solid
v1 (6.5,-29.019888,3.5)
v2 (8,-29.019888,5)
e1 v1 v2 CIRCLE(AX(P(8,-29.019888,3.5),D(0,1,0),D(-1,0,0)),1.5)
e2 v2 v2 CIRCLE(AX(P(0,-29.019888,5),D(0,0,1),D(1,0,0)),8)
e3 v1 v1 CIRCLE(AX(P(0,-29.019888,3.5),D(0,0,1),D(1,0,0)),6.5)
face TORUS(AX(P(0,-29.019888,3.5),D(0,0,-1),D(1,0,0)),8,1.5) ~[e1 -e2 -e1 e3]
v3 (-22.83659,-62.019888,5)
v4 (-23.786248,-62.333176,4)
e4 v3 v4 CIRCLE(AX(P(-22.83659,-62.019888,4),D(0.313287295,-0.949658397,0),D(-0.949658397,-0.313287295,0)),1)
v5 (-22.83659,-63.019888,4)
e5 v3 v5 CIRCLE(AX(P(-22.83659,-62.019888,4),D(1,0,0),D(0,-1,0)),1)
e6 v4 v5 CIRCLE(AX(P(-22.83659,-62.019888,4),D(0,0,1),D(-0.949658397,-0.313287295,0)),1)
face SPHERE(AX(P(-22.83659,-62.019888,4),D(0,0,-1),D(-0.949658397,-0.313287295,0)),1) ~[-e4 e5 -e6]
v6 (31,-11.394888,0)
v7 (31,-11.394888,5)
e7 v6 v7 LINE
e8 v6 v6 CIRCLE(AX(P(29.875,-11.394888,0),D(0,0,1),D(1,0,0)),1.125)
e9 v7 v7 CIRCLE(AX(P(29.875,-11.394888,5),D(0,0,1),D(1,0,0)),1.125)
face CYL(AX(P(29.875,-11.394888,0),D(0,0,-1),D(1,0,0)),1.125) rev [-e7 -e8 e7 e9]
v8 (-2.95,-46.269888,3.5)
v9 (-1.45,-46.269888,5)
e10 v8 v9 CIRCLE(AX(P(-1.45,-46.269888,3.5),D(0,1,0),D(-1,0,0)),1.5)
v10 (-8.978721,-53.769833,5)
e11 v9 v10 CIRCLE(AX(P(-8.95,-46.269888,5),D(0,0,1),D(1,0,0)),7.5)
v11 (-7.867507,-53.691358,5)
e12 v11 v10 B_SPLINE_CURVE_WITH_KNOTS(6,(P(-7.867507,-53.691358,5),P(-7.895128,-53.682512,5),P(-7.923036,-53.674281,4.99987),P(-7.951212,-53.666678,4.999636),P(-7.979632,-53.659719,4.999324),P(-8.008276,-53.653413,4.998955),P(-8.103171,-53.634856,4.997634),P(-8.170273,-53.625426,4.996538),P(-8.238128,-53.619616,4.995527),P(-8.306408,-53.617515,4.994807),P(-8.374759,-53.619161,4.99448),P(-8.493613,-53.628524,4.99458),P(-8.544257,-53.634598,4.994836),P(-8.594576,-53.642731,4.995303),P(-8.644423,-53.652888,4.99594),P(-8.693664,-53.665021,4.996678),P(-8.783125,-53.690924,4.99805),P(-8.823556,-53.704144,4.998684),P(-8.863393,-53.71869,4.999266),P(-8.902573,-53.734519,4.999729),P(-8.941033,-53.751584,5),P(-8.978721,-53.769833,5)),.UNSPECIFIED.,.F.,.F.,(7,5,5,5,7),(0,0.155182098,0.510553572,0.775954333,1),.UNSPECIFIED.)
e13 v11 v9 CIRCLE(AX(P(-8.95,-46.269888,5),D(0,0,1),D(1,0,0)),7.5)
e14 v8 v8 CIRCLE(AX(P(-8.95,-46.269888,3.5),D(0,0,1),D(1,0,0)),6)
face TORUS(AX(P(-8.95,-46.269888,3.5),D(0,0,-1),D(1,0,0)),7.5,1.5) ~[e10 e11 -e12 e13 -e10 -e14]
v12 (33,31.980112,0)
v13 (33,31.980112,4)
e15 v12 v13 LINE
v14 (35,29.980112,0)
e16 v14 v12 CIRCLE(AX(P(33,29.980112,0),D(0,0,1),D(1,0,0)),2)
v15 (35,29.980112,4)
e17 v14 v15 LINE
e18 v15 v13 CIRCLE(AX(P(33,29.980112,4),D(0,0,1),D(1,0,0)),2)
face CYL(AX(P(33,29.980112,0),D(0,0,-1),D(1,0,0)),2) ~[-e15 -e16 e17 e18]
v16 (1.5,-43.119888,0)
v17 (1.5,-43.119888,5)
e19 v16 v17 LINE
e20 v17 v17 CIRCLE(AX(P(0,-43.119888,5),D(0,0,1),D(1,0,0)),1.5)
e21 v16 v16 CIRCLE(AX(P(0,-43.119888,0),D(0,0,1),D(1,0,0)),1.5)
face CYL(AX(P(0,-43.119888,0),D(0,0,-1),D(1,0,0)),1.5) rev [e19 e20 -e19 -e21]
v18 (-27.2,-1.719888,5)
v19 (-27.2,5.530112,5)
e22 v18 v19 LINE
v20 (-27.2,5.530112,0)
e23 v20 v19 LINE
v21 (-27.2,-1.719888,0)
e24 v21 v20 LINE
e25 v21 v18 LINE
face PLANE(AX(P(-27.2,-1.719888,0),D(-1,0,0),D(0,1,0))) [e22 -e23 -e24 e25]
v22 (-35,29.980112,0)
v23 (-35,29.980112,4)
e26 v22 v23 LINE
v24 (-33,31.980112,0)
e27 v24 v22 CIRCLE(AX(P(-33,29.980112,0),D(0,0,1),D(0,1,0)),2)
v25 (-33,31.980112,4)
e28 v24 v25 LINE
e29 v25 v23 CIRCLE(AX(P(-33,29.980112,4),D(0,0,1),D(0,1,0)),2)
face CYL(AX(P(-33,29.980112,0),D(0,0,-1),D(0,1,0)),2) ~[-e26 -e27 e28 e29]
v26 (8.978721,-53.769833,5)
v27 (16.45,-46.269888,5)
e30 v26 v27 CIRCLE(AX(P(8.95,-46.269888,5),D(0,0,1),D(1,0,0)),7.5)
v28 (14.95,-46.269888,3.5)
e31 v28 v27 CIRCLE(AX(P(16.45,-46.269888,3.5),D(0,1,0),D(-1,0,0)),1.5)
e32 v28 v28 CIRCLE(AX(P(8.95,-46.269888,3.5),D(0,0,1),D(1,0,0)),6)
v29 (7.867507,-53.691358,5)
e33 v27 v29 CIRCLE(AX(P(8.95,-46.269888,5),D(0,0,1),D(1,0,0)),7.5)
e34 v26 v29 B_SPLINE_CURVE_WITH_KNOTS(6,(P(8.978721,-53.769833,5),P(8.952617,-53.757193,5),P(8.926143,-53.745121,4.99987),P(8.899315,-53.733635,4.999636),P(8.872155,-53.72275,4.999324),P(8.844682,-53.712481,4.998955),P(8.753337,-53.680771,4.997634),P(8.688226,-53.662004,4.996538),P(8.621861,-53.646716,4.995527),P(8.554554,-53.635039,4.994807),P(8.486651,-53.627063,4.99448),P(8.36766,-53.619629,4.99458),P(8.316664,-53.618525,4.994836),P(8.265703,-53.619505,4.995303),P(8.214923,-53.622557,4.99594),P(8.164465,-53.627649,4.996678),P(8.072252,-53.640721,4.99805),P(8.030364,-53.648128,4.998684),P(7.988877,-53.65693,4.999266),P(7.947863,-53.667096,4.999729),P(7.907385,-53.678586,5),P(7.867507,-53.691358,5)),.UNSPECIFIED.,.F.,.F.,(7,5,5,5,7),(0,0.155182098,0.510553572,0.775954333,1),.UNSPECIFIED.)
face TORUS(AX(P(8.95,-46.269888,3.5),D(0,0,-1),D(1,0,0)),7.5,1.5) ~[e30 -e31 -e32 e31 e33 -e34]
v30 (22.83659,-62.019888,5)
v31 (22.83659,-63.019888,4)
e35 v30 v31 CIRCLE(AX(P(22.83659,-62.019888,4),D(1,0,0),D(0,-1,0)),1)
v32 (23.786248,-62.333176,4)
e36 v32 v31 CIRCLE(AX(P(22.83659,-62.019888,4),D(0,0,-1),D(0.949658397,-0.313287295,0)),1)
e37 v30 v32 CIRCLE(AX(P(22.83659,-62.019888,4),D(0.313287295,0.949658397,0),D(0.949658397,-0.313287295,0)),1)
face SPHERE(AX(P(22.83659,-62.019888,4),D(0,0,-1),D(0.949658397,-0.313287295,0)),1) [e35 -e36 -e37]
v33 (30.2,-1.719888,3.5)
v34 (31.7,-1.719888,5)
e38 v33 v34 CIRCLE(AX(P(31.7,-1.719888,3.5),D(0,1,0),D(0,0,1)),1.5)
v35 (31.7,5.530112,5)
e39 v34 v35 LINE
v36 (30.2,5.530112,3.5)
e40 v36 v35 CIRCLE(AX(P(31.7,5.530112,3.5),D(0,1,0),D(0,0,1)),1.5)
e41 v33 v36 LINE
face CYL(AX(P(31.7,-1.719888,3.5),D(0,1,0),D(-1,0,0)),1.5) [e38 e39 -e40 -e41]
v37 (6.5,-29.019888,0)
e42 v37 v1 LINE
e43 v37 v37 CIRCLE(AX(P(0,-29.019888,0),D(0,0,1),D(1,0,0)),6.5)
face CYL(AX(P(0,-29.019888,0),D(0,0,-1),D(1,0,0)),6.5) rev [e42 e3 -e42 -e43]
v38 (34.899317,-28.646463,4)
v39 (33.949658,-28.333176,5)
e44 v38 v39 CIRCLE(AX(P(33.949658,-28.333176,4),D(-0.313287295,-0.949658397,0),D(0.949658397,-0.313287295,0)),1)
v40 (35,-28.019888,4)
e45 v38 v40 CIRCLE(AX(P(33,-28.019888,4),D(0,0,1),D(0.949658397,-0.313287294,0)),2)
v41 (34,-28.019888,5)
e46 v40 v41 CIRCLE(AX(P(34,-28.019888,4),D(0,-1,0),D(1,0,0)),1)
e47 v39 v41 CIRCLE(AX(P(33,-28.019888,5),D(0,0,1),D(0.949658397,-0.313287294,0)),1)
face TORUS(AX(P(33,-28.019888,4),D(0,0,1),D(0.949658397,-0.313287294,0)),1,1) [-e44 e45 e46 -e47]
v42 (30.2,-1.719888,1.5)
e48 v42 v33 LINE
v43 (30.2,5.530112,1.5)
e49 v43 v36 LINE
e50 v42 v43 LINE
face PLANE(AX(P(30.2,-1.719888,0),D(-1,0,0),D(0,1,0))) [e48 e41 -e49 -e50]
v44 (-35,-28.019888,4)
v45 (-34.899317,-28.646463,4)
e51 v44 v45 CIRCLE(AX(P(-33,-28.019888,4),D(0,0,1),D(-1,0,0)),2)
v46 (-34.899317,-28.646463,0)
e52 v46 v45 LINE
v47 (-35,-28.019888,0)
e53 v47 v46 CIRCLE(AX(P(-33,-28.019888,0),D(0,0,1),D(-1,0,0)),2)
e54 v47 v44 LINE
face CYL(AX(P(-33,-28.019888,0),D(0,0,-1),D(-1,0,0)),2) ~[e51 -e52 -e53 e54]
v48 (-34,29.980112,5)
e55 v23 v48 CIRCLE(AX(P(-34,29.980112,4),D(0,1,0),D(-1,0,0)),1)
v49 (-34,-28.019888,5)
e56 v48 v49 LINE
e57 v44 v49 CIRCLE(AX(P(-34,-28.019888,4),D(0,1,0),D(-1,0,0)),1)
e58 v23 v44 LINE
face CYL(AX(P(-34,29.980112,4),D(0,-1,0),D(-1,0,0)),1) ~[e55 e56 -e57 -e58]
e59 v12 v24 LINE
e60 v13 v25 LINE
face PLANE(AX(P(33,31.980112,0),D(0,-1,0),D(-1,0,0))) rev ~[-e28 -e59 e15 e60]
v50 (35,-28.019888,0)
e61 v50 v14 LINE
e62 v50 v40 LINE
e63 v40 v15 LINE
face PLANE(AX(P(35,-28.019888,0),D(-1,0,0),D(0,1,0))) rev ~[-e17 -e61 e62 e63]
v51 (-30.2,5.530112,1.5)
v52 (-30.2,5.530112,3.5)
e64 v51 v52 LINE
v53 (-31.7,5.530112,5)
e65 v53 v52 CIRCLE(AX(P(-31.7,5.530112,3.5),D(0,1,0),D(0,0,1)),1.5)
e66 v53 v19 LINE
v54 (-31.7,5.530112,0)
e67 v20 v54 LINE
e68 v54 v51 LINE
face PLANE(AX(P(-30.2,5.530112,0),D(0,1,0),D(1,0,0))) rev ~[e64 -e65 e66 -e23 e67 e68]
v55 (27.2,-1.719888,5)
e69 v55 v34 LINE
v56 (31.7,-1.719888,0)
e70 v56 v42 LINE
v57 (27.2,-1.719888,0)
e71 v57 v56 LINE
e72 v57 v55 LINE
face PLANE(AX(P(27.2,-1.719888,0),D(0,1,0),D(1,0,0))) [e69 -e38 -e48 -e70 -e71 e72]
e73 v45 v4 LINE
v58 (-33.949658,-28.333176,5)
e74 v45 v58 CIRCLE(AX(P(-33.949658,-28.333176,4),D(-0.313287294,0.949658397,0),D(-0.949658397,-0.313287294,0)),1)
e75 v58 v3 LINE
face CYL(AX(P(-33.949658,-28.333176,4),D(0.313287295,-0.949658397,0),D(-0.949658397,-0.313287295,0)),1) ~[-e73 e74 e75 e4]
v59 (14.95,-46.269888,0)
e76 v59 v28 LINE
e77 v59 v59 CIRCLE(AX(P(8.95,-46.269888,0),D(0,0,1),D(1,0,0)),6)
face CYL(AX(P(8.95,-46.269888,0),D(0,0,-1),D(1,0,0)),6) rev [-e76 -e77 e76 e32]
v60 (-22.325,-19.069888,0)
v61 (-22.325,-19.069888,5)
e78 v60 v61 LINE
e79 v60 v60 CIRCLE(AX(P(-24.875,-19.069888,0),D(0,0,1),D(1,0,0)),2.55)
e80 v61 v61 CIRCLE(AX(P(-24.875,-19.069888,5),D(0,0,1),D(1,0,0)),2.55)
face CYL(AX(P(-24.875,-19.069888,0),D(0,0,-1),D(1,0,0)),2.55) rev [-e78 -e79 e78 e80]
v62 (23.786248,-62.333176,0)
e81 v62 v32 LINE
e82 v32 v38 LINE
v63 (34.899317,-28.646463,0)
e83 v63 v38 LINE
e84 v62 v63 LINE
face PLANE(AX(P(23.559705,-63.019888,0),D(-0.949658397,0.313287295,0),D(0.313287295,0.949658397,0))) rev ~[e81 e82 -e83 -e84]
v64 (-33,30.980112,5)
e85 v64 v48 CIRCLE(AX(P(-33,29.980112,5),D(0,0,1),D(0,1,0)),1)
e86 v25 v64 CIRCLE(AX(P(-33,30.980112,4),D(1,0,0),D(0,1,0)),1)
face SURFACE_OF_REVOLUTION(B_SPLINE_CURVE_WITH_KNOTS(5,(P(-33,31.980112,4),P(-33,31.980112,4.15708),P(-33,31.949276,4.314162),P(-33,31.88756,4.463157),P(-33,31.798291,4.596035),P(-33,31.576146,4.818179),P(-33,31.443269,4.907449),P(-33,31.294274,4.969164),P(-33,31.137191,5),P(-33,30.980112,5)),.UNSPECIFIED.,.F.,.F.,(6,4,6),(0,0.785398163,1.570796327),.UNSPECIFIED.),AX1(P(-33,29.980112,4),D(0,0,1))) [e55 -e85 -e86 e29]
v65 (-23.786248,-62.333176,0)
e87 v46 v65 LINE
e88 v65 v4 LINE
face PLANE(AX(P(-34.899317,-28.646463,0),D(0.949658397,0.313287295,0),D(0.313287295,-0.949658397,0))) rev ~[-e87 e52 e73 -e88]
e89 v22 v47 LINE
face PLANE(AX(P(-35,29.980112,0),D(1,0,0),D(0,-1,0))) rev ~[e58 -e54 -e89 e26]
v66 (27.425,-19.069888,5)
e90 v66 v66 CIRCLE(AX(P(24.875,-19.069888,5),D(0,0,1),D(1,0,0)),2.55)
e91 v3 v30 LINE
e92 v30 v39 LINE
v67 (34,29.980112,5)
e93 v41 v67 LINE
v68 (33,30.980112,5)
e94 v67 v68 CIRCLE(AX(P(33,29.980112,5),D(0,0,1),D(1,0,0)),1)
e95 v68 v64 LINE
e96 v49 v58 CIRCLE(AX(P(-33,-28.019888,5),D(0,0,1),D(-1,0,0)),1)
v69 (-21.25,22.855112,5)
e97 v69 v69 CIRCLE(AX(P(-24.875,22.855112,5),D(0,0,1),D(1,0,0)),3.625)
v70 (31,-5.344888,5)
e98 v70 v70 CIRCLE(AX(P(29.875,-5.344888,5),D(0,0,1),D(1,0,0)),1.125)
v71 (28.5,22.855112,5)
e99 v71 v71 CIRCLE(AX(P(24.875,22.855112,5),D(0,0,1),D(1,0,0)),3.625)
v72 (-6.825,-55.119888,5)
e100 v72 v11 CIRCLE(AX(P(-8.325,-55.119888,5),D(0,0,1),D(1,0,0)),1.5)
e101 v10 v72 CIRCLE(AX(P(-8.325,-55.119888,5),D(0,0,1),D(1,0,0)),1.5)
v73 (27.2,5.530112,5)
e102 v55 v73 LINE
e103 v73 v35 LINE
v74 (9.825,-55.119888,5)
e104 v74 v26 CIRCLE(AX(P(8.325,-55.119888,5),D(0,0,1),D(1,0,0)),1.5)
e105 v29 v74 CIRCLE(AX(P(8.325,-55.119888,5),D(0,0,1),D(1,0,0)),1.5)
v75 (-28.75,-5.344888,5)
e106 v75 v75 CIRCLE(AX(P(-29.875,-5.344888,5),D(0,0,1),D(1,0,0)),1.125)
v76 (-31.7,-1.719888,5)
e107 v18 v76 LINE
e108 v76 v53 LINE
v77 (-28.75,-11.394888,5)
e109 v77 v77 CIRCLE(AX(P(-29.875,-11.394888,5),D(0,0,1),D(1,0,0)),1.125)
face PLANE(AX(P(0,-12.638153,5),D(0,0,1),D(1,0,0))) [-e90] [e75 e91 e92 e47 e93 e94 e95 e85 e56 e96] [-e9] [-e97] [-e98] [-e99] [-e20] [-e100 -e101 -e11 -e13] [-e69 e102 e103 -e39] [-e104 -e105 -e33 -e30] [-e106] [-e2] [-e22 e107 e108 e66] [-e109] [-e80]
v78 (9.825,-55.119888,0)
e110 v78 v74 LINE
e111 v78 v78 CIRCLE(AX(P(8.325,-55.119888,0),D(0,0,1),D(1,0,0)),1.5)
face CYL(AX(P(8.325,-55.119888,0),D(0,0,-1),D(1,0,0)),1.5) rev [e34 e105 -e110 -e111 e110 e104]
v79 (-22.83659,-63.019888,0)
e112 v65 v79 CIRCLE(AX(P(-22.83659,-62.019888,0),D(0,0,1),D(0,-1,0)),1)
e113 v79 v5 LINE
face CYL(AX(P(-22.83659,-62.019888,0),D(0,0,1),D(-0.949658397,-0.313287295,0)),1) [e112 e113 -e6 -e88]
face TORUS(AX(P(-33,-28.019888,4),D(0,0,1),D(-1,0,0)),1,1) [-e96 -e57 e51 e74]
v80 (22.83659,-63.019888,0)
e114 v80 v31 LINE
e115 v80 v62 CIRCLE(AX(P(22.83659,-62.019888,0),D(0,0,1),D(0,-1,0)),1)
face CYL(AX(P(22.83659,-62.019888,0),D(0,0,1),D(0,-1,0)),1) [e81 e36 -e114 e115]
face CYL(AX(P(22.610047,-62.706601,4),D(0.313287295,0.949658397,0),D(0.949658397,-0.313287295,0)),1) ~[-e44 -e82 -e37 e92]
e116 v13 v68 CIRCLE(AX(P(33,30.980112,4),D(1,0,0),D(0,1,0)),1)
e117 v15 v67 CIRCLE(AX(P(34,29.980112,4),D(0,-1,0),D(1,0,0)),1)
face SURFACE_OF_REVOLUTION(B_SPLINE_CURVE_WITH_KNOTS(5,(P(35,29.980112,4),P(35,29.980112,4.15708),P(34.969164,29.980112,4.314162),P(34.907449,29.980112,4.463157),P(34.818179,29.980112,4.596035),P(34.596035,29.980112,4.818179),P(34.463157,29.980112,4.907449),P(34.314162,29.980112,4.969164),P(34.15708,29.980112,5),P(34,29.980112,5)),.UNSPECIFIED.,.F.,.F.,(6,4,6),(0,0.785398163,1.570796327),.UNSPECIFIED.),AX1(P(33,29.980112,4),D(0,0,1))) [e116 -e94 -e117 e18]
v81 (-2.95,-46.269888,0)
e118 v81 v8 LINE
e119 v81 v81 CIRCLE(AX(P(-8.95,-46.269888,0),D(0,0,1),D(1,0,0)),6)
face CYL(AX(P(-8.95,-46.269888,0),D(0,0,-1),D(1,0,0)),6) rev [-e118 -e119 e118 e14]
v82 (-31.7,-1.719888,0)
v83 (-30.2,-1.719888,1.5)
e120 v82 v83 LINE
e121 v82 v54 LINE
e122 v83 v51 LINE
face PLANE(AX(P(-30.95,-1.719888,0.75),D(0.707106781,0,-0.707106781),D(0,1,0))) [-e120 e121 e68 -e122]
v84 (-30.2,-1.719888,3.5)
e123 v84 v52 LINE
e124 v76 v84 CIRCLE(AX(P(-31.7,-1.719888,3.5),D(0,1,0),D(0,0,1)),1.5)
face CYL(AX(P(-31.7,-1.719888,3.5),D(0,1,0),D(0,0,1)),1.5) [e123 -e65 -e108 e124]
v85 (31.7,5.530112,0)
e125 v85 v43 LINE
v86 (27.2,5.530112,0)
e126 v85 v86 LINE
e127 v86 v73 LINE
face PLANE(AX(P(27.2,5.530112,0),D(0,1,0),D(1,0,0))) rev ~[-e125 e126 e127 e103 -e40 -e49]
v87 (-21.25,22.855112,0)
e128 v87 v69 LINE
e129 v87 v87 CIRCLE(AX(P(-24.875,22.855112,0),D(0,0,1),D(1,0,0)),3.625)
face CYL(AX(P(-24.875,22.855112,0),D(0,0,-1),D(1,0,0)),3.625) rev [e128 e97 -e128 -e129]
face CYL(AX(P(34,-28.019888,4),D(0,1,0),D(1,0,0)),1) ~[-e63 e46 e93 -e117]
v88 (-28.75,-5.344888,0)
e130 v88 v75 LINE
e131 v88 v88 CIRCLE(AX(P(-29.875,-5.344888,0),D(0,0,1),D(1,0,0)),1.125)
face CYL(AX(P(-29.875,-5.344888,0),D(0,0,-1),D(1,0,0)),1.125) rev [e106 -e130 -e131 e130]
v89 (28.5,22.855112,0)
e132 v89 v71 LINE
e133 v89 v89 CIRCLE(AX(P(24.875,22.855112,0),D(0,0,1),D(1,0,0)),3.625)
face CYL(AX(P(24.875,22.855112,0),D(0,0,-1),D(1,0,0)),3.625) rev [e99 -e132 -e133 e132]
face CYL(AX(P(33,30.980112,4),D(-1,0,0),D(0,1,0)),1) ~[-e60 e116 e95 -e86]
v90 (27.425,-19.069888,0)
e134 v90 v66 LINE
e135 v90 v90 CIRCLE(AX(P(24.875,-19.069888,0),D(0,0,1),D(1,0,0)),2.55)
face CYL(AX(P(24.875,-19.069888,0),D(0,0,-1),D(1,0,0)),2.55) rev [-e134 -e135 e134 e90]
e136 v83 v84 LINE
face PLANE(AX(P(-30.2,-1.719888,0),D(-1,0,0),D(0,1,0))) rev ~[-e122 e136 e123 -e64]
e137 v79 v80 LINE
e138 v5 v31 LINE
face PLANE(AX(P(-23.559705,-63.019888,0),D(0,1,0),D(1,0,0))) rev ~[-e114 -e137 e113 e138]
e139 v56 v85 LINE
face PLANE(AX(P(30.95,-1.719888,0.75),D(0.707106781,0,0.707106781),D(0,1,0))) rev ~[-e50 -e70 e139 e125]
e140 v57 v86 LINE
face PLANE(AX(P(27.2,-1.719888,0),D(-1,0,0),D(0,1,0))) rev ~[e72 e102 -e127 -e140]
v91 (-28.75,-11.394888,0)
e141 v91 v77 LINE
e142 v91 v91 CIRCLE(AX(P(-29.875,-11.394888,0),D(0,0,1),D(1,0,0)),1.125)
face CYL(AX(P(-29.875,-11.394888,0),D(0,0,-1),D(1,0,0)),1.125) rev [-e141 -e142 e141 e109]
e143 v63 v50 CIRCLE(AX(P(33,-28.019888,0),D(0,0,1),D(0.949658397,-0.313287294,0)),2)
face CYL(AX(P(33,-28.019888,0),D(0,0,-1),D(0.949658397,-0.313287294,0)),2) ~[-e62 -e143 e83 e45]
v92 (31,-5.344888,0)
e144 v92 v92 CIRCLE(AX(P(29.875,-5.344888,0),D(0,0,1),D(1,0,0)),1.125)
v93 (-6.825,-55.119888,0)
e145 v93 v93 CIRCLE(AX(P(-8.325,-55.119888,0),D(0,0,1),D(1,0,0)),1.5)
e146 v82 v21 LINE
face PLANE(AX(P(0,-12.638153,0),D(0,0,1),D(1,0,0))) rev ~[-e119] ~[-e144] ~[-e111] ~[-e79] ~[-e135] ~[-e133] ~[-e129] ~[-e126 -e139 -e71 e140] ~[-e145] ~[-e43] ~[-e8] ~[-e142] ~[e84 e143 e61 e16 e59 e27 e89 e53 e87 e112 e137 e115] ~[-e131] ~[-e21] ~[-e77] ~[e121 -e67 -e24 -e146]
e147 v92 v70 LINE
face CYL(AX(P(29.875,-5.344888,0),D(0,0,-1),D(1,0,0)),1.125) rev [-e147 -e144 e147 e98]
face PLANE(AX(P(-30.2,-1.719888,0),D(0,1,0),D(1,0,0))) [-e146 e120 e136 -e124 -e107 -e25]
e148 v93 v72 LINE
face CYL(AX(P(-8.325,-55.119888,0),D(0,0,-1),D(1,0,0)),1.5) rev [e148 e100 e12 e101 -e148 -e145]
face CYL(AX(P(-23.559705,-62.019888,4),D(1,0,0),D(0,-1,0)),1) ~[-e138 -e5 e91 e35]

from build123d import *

# Parameters (mm, degrees)
F0_R     = 1.5
F0_R_2   = 6
F0_R_3   = 2.55
F0_R_4   = 6.5
F0_R_5   = 1.125
F0_W     = 3
F0_H     = 7.25
F0_R_6   = 3.625
F1_DEPTH = 5
F2_R     = 1.5
F3_R     = 1.5
F4_SIZE  = 1.5
F5_SIZE  = 1.5
F7_R     = 1


# Not quite as in the source:
# - a fillet or chamfer that OpenCascade refuses, or shapes differently, is made with other operations: its cross-section is extruded or revolved along the edge and cut away or added


with BuildPart() as f1:
    # F0 (on Top) → F1 (new body)
    with BuildSketch(Plane.XY):
        with BuildLine():
            Line((33, 31.9801117687), (0, 31.9801117687))
            Line((0, 31.9801117687), (-33, 31.9801117687))
            ThreePointArc((-33, 31.9801117687), (-34.4142135624, 31.3943253311), (-35, 29.9801117687))
            Line((-35, 29.9801117687), (-35, 0))
            Line((-35, 0), (-35, -28.0198882313))
            ThreePointArc((-35, -28.0198882313), (-34.9746687808, -28.337194402), (-34.899316794, -28.6464628206))
            Line((-34.899316794, -28.6464628206), (-23.5597051086, -63.0198882313))
            Line((-23.5597051086, -63.0198882313), (0, -63.0198882313))
            Line((0, -63.0198882313), (23.5597051086, -63.0198882313))
            Line((23.5597051086, -63.0198882313), (34.899316794, -28.6464628206))
            ThreePointArc((34.899316794, -28.6464628206), (34.9746687808, -28.337194402), (35, -28.0198882313))
            Line((35, -28.0198882313), (35, 0))
            Line((35, 0), (35, 29.9801117687))
            ThreePointArc((35, 29.9801117687), (34.4142135624, 31.3943253311), (33, 31.9801117687))
        make_face()
        with Locations((-8.325, -55.1198882313)):
            Circle(F0_R, mode=Mode.SUBTRACT)
        with Locations((-8.95, -46.2698882313)):
            Circle(F0_R_2, mode=Mode.SUBTRACT)
        with Locations((-24.875, -19.0698882313)):
            Circle(F0_R_3, mode=Mode.SUBTRACT)
        with Locations((8.325, -55.1198882313)):
            Circle(F0_R, mode=Mode.SUBTRACT)
        with Locations((0, -43.1198882313)):
            Circle(F0_R, mode=Mode.SUBTRACT)
        with Locations((8.95, -46.2698882313)):
            Circle(F0_R_2, mode=Mode.SUBTRACT)
        with Locations((0, -29.0198882313)):
            Circle(F0_R_4, mode=Mode.SUBTRACT)
        with Locations((24.875, -19.0698882313)):
            Circle(F0_R_3, mode=Mode.SUBTRACT)
        with Locations((-29.875, -11.3948882313)):
            Circle(F0_R_5, mode=Mode.SUBTRACT)
        with Locations((-29.875, -5.3448882313)):
            Circle(F0_R_5, mode=Mode.SUBTRACT)
        with Locations((-28.7, 1.9051117687)):
            Rectangle(F0_W, F0_H, mode=Mode.SUBTRACT)
        with Locations((-24.875, 22.8551117687)):
            Circle(F0_R_6, mode=Mode.SUBTRACT)
        with Locations((29.875, -11.3948882313)):
            Circle(F0_R_5, mode=Mode.SUBTRACT)
        with Locations((29.875, -5.3448882313)):
            Circle(F0_R_5, mode=Mode.SUBTRACT)
        with Locations((28.7, 1.9051117687)):
            Rectangle(F0_W, F0_H, mode=Mode.SUBTRACT)
        with Locations((24.875, 22.8551117687)):
            Circle(F0_R_6, mode=Mode.SUBTRACT)
    extrude(amount=F1_DEPTH)

    # F2
    f2_edges = [f1.edges().sort_by_distance(p)[0] for p in [
        (30.2, 1.905112, 5),
    ]]
    fillet(f2_edges, radius=F2_R)

    # F3
    f3_edges = [f1.edges().sort_by_distance(p)[0] for p in [
        (-30.2, 1.905112, 5),
    ]]
    fillet(f3_edges, radius=F3_R)

    # F4
    f4_edges = [f1.edges().sort_by_distance(p)[0] for p in [
        (30.2, 1.905112, 0),
    ]]
    chamfer(f4_edges, length=F4_SIZE)

    # F5
    f5_edges = [f1.edges().sort_by_distance(p)[0] for p in [
        (-30.2, 1.905112, 0),
    ]]
    chamfer(f5_edges, length=F5_SIZE)

    # F6: fillet of radius 1.5 on 3 edges, made by hand

    # F6_s1 → F6_t2 (revolve, cut)
    with BuildSketch(Plane.XZ.offset(29.0198882313)):
        with BuildLine():
            ThreePointArc((6.5, 3.5), (6.9393398282, 4.5606601718), (8, 5))
            Line((8, 5), (6.5, 5))
            Line((6.5, 5), (6.5, 3.5))
        make_face()
    revolve(axis=Axis((0, -29.0198882313, 5), (0, 0, 1)), mode=Mode.SUBTRACT)

    # F6_s3 → F6_t4 (revolve, cut)
    with BuildSketch(Plane.XZ.offset(46.2698882313)):
        with BuildLine():
            ThreePointArc((-2.95, 3.5), (-2.5106601718, 4.5606601718), (-1.45, 5))
            Line((-1.45, 5), (-2.95, 5))
            Line((-2.95, 5), (-2.95, 3.5))
        make_face()
    revolve(axis=Axis((-8.95, -46.2698882313, 5), (0, 0, 1)), mode=Mode.SUBTRACT)

    # F6_s5 → F6_t6 (revolve, cut)
    with BuildSketch(Plane.XZ.offset(46.2698882313)):
        with BuildLine():
            ThreePointArc((14.95, 3.5), (15.3893398282, 4.5606601718), (16.45, 5))
            Line((16.45, 5), (14.95, 5))
            Line((14.95, 5), (14.95, 3.5))
        make_face()
    revolve(axis=Axis((8.95, -46.2698882313, 5), (0, 0, 1)), mode=Mode.SUBTRACT)

    # F7
    f7_edges = [f1.edges().sort_by_distance(p)[0] for p in [
        (29.229511, -45.833176, 5),
        (0, -63.019888, 5),
        (23.559705, -63.019888, 2.5),
        (-23.559705, -63.019888, 2.5),
        (34.974669, -28.337194, 5),
        (-34.974669, -28.337194, 5),
        (0, 31.980112, 5),
        (-34.414214, 31.394325, 5),
        (-35, 0.980112, 5),
        (-29.229511, -45.833176, 5),
        (35, 0.980112, 5),
        (34.414214, 31.394325, 5),
    ]]
    fillet(f7_edges, radius=F7_R)


solid = f1.part
